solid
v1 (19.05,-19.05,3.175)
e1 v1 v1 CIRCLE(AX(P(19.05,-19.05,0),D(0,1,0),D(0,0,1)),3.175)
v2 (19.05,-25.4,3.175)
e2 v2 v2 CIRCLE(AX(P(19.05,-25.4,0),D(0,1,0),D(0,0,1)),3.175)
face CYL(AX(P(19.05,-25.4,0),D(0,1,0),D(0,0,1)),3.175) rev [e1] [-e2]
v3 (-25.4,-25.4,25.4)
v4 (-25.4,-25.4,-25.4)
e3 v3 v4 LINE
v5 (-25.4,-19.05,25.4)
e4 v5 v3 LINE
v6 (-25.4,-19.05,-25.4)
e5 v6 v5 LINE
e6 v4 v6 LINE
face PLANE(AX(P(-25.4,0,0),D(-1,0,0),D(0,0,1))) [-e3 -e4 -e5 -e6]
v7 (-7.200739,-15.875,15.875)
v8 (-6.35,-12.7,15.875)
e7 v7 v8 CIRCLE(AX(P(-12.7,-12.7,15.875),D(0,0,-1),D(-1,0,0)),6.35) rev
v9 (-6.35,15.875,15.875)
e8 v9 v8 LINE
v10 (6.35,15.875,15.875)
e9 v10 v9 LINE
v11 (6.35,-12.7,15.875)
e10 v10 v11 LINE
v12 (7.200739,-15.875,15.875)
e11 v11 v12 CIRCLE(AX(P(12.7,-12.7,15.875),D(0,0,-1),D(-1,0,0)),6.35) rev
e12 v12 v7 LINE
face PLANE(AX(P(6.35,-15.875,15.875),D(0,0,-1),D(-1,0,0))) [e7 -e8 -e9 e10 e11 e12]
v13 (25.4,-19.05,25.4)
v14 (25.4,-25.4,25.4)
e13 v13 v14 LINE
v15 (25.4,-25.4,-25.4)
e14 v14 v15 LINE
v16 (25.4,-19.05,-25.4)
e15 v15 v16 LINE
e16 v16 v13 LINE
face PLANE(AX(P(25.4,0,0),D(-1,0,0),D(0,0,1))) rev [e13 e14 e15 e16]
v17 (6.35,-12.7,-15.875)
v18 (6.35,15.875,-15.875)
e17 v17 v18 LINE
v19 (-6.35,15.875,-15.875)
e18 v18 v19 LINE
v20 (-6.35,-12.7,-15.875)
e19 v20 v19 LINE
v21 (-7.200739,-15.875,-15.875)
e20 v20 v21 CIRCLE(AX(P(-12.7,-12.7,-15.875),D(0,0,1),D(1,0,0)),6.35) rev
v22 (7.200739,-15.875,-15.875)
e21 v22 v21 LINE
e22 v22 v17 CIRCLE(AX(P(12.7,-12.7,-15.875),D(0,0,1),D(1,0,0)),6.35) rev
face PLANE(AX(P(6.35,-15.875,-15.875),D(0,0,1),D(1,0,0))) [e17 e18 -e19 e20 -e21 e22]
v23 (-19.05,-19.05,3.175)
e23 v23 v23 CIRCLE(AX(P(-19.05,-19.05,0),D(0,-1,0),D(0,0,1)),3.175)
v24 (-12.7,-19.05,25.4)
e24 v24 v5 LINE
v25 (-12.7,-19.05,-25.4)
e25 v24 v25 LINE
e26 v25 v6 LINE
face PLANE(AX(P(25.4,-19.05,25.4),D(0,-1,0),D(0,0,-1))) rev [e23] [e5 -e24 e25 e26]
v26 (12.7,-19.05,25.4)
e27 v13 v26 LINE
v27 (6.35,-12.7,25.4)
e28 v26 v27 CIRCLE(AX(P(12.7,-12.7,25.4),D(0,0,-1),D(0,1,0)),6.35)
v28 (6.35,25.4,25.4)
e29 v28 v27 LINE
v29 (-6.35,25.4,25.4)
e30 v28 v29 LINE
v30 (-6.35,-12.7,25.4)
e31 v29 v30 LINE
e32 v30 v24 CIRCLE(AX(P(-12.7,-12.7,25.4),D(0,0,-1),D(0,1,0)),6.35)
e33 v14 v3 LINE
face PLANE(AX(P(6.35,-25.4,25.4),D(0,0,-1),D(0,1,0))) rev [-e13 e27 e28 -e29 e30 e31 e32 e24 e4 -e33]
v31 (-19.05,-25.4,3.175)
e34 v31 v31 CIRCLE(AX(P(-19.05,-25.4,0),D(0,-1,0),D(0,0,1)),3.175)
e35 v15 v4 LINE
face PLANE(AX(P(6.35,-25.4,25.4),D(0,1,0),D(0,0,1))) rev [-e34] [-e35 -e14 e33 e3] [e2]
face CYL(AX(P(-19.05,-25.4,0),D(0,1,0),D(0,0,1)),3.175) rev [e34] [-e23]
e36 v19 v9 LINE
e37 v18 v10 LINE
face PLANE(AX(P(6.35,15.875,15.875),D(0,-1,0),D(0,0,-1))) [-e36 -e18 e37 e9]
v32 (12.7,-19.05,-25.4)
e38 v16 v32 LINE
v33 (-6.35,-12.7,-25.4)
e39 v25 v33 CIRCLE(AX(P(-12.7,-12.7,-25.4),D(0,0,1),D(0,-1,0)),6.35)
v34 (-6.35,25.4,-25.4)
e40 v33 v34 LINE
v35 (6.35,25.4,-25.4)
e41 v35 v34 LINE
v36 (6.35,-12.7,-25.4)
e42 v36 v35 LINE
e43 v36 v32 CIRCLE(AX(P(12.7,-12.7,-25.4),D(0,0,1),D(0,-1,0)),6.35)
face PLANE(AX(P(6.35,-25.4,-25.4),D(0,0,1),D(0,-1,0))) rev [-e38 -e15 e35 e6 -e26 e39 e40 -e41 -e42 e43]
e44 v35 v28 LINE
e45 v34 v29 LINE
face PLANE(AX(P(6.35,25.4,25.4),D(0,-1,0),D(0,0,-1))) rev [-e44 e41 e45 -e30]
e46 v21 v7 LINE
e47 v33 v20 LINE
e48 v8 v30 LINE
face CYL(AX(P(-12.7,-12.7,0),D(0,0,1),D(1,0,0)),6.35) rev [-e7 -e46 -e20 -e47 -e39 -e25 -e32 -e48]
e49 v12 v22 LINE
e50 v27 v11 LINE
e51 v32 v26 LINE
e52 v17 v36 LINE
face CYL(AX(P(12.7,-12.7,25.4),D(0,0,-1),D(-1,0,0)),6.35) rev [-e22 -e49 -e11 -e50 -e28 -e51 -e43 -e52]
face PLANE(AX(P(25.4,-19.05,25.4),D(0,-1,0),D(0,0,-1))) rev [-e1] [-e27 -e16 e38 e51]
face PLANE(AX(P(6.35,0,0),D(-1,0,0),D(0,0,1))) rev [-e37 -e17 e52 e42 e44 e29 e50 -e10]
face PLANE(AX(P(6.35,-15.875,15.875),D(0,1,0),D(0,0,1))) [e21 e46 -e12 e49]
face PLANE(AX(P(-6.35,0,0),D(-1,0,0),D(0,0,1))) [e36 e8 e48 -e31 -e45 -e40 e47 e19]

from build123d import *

# Parameters (mm, degrees)
SKETCH1_W           = 50.8
SKETCH1_H           = 50.8
SKETCH1_W_2         = 31.75
SKETCH1_H_2         = 31.75
BOSS_EXTRUDE1_DEPTH = 6.35
SKETCH2_W           = 50.8
SKETCH2_H           = 6.35
BOSS_EXTRUDE2_DEPTH = 25.4
FILLET1_R           = 6.35
SKETCH3_R           = 3.175
CUT_EXTRUDE1_DEPTH  = 58.15


with BuildPart() as part:
    # Sketch1 → Boss-Extrude1 (new, symmetric)
    with BuildSketch(Plane(origin=(0, 0, 0), x_dir=(0, 0, -1), z_dir=(1, 0, 0))):
        Rectangle(SKETCH1_W, SKETCH1_H)
        Rectangle(SKETCH1_W_2, SKETCH1_H_2, mode=Mode.SUBTRACT)
    extrude(amount=BOSS_EXTRUDE1_DEPTH, both=True)

    # Sketch2 → Boss-Extrude2 (add, symmetric)
    with BuildSketch(Plane(origin=(0, 0, 0), x_dir=(0, 0, -1), z_dir=(1, 0, 0))):
        with Locations((0, -22.225)):
            Rectangle(SKETCH2_W, SKETCH2_H)
    extrude(amount=BOSS_EXTRUDE2_DEPTH, both=True)

    # Fillet1
    # the kernel refuses this fillet: 6.35 mm, written as the material it adds along each edge
    with BuildSketch(Plane(origin=(-6.35, -19.05, -25.4), x_dir=(0, 1, 0), z_dir=(0, 0, 1))) as fillet1_piece_1_section:
        with BuildLine():
            CenterArc((FILLET1_R, FILLET1_R), FILLET1_R, 180, 90)
            Line((0, FILLET1_R), (0, 0))
            Line((0, 0), (FILLET1_R, 0))
        make_face()
    fillet1_piece_1 = extrude(amount=50.8, mode=Mode.PRIVATE)
    fillet1_piece_1 = split(fillet1_piece_1, bisect_by=Plane(origin=(-6.502453224, -14.838357518, -15.875), z_dir=(0, 0, -1)), keep=Keep.TOP, mode=Mode.PRIVATE)
    fillet1_piece_1 = split(fillet1_piece_1, bisect_by=Plane(origin=(-6.502453224, -15.875, -20.6375), z_dir=(0, 1, 0)), keep=Keep.TOP, mode=Mode.PRIVATE)
    add(fillet1_piece_1)
    with BuildSketch(Plane(origin=(-6.35, -19.05, -25.4), x_dir=(0, 1, 0), z_dir=(0, 0, 1))) as fillet1_piece_2_section:
        with BuildLine():
            CenterArc((FILLET1_R, FILLET1_R), FILLET1_R, 180, 90)
            Line((0, FILLET1_R), (0, 0))
            Line((0, 0), (FILLET1_R, 0))
        make_face()
    fillet1_piece_2 = extrude(amount=50.8, mode=Mode.PRIVATE)
    fillet1_piece_2 = split(fillet1_piece_2, bisect_by=Plane(origin=(-7.970012381, -18.006112297, -15.875), z_dir=(0, 0, -1)), keep=Keep.TOP, mode=Mode.PRIVATE)
    fillet1_piece_2 = split(fillet1_piece_2, bisect_by=Plane(origin=(-7.970012381, -15.875, -20.6375), z_dir=(0, -1, 0)), keep=Keep.TOP, mode=Mode.PRIVATE)
    add(fillet1_piece_2)
    with BuildSketch(Plane(origin=(-6.35, -19.05, -25.4), x_dir=(0, 1, 0), z_dir=(0, 0, 1))) as fillet1_piece_3_section:
        with BuildLine():
            CenterArc((FILLET1_R, FILLET1_R), FILLET1_R, 180, 90)
            Line((0, FILLET1_R), (0, 0))
            Line((0, 0), (FILLET1_R, 0))
        make_face()
    fillet1_piece_3 = extrude(amount=50.8, mode=Mode.PRIVATE)
    fillet1_piece_3 = split(fillet1_piece_3, bisect_by=Plane(origin=(-7.970012381, -18.006112297, -15.875), z_dir=(0, 0, 1)), keep=Keep.TOP, mode=Mode.PRIVATE)
    fillet1_piece_3 = split(fillet1_piece_3, bisect_by=Plane(origin=(-7.970012381, -15.875, 0), z_dir=(0, -1, 0)), keep=Keep.TOP, mode=Mode.PRIVATE)
    fillet1_piece_3 = split(fillet1_piece_3, bisect_by=Plane(origin=(-7.970012381, -18.006112297, 15.875), z_dir=(0, 0, -1)), keep=Keep.TOP, mode=Mode.PRIVATE)
    add(fillet1_piece_3)
    with BuildSketch(Plane(origin=(-6.35, -19.05, -25.4), x_dir=(0, 1, 0), z_dir=(0, 0, 1))) as fillet1_piece_4_section:
        with BuildLine():
            CenterArc((FILLET1_R, FILLET1_R), FILLET1_R, 180, 90)
            Line((0, FILLET1_R), (0, 0))
            Line((0, 0), (FILLET1_R, 0))
        make_face()
    fillet1_piece_4 = extrude(amount=50.8, mode=Mode.PRIVATE)
    fillet1_piece_4 = split(fillet1_piece_4, bisect_by=Plane(origin=(-6.502453224, -15.875, 20.6375), z_dir=(0, 1, 0)), keep=Keep.TOP, mode=Mode.PRIVATE)
    fillet1_piece_4 = split(fillet1_piece_4, bisect_by=Plane(origin=(-6.502453224, -14.838357518, 15.875), z_dir=(0, 0, 1)), keep=Keep.TOP, mode=Mode.PRIVATE)
    add(fillet1_piece_4)
    with BuildSketch(Plane(origin=(-6.35, -19.05, -25.4), x_dir=(0, 1, 0), z_dir=(0, 0, 1))) as fillet1_piece_5_section:
        with BuildLine():
            CenterArc((FILLET1_R, FILLET1_R), FILLET1_R, 180, 90)
            Line((0, FILLET1_R), (0, 0))
            Line((0, 0), (FILLET1_R, 0))
        make_face()
    fillet1_piece_5 = extrude(amount=50.8, mode=Mode.PRIVATE)
    fillet1_piece_5 = split(fillet1_piece_5, bisect_by=Plane(origin=(-7.970012381, -15.875, 20.6375), z_dir=(0, -1, 0)), keep=Keep.TOP, mode=Mode.PRIVATE)
    fillet1_piece_5 = split(fillet1_piece_5, bisect_by=Plane(origin=(-7.970012381, -18.006112297, 15.875), z_dir=(0, 0, 1)), keep=Keep.TOP, mode=Mode.PRIVATE)
    add(fillet1_piece_5)
    with BuildSketch(Plane(origin=(6.35, -19.05, -25.4), x_dir=(1, 0, 0), z_dir=(0, 0, 1))) as fillet1_piece_6_section:
        with BuildLine():
            CenterArc((FILLET1_R, FILLET1_R), FILLET1_R, 180, 90)
            Line((0, FILLET1_R), (0, 0))
            Line((0, 0), (FILLET1_R, 0))
        make_face()
    fillet1_piece_6 = extrude(amount=50.8, mode=Mode.PRIVATE)
    fillet1_piece_6 = split(fillet1_piece_6, bisect_by=Plane(origin=(7.970012381, -15.875, -20.6375), z_dir=(0, -1, 0)), keep=Keep.TOP, mode=Mode.PRIVATE)
    fillet1_piece_6 = split(fillet1_piece_6, bisect_by=Plane(origin=(7.970012381, -18.006112297, -15.875), z_dir=(0, 0, -1)), keep=Keep.TOP, mode=Mode.PRIVATE)
    add(fillet1_piece_6)
    with BuildSketch(Plane(origin=(6.35, -19.05, -25.4), x_dir=(1, 0, 0), z_dir=(0, 0, 1))) as fillet1_piece_7_section:
        with BuildLine():
            CenterArc((FILLET1_R, FILLET1_R), FILLET1_R, 180, 90)
            Line((0, FILLET1_R), (0, 0))
            Line((0, 0), (FILLET1_R, 0))
        make_face()
    fillet1_piece_7 = extrude(amount=50.8, mode=Mode.PRIVATE)
    fillet1_piece_7 = split(fillet1_piece_7, bisect_by=Plane(origin=(6.502453224, -15.875, -20.6375), z_dir=(0, 1, 0)), keep=Keep.TOP, mode=Mode.PRIVATE)
    fillet1_piece_7 = split(fillet1_piece_7, bisect_by=Plane(origin=(6.502453224, -14.838357518, -15.875), z_dir=(0, 0, -1)), keep=Keep.TOP, mode=Mode.PRIVATE)
    add(fillet1_piece_7)
    with BuildSketch(Plane(origin=(6.35, -19.05, -25.4), x_dir=(1, 0, 0), z_dir=(0, 0, 1))) as fillet1_piece_8_section:
        with BuildLine():
            CenterArc((FILLET1_R, FILLET1_R), FILLET1_R, 180, 90)
            Line((0, FILLET1_R), (0, 0))
            Line((0, 0), (FILLET1_R, 0))
        make_face()
    fillet1_piece_8 = extrude(amount=50.8, mode=Mode.PRIVATE)
    fillet1_piece_8 = split(fillet1_piece_8, bisect_by=Plane(origin=(7.970012381, -18.006112297, 15.875), z_dir=(0, 0, -1)), keep=Keep.TOP, mode=Mode.PRIVATE)
    fillet1_piece_8 = split(fillet1_piece_8, bisect_by=Plane(origin=(7.970012381, -15.875, 0), z_dir=(0, -1, 0)), keep=Keep.TOP, mode=Mode.PRIVATE)
    fillet1_piece_8 = split(fillet1_piece_8, bisect_by=Plane(origin=(7.970012381, -18.006112297, -15.875), z_dir=(0, 0, 1)), keep=Keep.TOP, mode=Mode.PRIVATE)
    add(fillet1_piece_8)
    with BuildSketch(Plane(origin=(6.35, -19.05, -25.4), x_dir=(1, 0, 0), z_dir=(0, 0, 1))) as fillet1_piece_9_section:
        with BuildLine():
            CenterArc((FILLET1_R, FILLET1_R), FILLET1_R, 180, 90)
            Line((0, FILLET1_R), (0, 0))
            Line((0, 0), (FILLET1_R, 0))
        make_face()
    fillet1_piece_9 = extrude(amount=50.8, mode=Mode.PRIVATE)
    fillet1_piece_9 = split(fillet1_piece_9, bisect_by=Plane(origin=(7.970012381, -18.006112297, 15.875), z_dir=(0, 0, 1)), keep=Keep.TOP, mode=Mode.PRIVATE)
    fillet1_piece_9 = split(fillet1_piece_9, bisect_by=Plane(origin=(7.970012381, -15.875, 20.6375), z_dir=(0, -1, 0)), keep=Keep.TOP, mode=Mode.PRIVATE)
    add(fillet1_piece_9)
    with BuildSketch(Plane(origin=(6.35, -19.05, -25.4), x_dir=(1, 0, 0), z_dir=(0, 0, 1))) as fillet1_piece_10_section:
        with BuildLine():
            CenterArc((FILLET1_R, FILLET1_R), FILLET1_R, 180, 90)
            Line((0, FILLET1_R), (0, 0))
            Line((0, 0), (FILLET1_R, 0))
        make_face()
    fillet1_piece_10 = extrude(amount=50.8, mode=Mode.PRIVATE)
    fillet1_piece_10 = split(fillet1_piece_10, bisect_by=Plane(origin=(6.502453224, -14.838357518, 15.875), z_dir=(0, 0, 1)), keep=Keep.TOP, mode=Mode.PRIVATE)
    fillet1_piece_10 = split(fillet1_piece_10, bisect_by=Plane(origin=(6.502453224, -15.875, 20.6375), z_dir=(0, 1, 0)), keep=Keep.TOP, mode=Mode.PRIVATE)
    add(fillet1_piece_10)

    # Sketch3 → Cut-Extrude1 (cut, through all)
    with BuildSketch(Plane(origin=(0, -19.05, 0), x_dir=(1, 0, 0), z_dir=(0, 1, 0))):
        with Locations(Location((19.05, 0, 0), (0, 0, 270))):
            Circle(SKETCH3_R)
    cut_extrude1 = extrude(amount=-CUT_EXTRUDE1_DEPTH, mode=Mode.SUBTRACT)

    # Mirror1: Cut-Extrude1 across plane
    add(cut_extrude1.mirror(Plane(origin=(0, 0, 0), x_dir=(0, 0, 1), z_dir=(1, 0, 0))), mode=Mode.SUBTRACT)


solid = part.part
